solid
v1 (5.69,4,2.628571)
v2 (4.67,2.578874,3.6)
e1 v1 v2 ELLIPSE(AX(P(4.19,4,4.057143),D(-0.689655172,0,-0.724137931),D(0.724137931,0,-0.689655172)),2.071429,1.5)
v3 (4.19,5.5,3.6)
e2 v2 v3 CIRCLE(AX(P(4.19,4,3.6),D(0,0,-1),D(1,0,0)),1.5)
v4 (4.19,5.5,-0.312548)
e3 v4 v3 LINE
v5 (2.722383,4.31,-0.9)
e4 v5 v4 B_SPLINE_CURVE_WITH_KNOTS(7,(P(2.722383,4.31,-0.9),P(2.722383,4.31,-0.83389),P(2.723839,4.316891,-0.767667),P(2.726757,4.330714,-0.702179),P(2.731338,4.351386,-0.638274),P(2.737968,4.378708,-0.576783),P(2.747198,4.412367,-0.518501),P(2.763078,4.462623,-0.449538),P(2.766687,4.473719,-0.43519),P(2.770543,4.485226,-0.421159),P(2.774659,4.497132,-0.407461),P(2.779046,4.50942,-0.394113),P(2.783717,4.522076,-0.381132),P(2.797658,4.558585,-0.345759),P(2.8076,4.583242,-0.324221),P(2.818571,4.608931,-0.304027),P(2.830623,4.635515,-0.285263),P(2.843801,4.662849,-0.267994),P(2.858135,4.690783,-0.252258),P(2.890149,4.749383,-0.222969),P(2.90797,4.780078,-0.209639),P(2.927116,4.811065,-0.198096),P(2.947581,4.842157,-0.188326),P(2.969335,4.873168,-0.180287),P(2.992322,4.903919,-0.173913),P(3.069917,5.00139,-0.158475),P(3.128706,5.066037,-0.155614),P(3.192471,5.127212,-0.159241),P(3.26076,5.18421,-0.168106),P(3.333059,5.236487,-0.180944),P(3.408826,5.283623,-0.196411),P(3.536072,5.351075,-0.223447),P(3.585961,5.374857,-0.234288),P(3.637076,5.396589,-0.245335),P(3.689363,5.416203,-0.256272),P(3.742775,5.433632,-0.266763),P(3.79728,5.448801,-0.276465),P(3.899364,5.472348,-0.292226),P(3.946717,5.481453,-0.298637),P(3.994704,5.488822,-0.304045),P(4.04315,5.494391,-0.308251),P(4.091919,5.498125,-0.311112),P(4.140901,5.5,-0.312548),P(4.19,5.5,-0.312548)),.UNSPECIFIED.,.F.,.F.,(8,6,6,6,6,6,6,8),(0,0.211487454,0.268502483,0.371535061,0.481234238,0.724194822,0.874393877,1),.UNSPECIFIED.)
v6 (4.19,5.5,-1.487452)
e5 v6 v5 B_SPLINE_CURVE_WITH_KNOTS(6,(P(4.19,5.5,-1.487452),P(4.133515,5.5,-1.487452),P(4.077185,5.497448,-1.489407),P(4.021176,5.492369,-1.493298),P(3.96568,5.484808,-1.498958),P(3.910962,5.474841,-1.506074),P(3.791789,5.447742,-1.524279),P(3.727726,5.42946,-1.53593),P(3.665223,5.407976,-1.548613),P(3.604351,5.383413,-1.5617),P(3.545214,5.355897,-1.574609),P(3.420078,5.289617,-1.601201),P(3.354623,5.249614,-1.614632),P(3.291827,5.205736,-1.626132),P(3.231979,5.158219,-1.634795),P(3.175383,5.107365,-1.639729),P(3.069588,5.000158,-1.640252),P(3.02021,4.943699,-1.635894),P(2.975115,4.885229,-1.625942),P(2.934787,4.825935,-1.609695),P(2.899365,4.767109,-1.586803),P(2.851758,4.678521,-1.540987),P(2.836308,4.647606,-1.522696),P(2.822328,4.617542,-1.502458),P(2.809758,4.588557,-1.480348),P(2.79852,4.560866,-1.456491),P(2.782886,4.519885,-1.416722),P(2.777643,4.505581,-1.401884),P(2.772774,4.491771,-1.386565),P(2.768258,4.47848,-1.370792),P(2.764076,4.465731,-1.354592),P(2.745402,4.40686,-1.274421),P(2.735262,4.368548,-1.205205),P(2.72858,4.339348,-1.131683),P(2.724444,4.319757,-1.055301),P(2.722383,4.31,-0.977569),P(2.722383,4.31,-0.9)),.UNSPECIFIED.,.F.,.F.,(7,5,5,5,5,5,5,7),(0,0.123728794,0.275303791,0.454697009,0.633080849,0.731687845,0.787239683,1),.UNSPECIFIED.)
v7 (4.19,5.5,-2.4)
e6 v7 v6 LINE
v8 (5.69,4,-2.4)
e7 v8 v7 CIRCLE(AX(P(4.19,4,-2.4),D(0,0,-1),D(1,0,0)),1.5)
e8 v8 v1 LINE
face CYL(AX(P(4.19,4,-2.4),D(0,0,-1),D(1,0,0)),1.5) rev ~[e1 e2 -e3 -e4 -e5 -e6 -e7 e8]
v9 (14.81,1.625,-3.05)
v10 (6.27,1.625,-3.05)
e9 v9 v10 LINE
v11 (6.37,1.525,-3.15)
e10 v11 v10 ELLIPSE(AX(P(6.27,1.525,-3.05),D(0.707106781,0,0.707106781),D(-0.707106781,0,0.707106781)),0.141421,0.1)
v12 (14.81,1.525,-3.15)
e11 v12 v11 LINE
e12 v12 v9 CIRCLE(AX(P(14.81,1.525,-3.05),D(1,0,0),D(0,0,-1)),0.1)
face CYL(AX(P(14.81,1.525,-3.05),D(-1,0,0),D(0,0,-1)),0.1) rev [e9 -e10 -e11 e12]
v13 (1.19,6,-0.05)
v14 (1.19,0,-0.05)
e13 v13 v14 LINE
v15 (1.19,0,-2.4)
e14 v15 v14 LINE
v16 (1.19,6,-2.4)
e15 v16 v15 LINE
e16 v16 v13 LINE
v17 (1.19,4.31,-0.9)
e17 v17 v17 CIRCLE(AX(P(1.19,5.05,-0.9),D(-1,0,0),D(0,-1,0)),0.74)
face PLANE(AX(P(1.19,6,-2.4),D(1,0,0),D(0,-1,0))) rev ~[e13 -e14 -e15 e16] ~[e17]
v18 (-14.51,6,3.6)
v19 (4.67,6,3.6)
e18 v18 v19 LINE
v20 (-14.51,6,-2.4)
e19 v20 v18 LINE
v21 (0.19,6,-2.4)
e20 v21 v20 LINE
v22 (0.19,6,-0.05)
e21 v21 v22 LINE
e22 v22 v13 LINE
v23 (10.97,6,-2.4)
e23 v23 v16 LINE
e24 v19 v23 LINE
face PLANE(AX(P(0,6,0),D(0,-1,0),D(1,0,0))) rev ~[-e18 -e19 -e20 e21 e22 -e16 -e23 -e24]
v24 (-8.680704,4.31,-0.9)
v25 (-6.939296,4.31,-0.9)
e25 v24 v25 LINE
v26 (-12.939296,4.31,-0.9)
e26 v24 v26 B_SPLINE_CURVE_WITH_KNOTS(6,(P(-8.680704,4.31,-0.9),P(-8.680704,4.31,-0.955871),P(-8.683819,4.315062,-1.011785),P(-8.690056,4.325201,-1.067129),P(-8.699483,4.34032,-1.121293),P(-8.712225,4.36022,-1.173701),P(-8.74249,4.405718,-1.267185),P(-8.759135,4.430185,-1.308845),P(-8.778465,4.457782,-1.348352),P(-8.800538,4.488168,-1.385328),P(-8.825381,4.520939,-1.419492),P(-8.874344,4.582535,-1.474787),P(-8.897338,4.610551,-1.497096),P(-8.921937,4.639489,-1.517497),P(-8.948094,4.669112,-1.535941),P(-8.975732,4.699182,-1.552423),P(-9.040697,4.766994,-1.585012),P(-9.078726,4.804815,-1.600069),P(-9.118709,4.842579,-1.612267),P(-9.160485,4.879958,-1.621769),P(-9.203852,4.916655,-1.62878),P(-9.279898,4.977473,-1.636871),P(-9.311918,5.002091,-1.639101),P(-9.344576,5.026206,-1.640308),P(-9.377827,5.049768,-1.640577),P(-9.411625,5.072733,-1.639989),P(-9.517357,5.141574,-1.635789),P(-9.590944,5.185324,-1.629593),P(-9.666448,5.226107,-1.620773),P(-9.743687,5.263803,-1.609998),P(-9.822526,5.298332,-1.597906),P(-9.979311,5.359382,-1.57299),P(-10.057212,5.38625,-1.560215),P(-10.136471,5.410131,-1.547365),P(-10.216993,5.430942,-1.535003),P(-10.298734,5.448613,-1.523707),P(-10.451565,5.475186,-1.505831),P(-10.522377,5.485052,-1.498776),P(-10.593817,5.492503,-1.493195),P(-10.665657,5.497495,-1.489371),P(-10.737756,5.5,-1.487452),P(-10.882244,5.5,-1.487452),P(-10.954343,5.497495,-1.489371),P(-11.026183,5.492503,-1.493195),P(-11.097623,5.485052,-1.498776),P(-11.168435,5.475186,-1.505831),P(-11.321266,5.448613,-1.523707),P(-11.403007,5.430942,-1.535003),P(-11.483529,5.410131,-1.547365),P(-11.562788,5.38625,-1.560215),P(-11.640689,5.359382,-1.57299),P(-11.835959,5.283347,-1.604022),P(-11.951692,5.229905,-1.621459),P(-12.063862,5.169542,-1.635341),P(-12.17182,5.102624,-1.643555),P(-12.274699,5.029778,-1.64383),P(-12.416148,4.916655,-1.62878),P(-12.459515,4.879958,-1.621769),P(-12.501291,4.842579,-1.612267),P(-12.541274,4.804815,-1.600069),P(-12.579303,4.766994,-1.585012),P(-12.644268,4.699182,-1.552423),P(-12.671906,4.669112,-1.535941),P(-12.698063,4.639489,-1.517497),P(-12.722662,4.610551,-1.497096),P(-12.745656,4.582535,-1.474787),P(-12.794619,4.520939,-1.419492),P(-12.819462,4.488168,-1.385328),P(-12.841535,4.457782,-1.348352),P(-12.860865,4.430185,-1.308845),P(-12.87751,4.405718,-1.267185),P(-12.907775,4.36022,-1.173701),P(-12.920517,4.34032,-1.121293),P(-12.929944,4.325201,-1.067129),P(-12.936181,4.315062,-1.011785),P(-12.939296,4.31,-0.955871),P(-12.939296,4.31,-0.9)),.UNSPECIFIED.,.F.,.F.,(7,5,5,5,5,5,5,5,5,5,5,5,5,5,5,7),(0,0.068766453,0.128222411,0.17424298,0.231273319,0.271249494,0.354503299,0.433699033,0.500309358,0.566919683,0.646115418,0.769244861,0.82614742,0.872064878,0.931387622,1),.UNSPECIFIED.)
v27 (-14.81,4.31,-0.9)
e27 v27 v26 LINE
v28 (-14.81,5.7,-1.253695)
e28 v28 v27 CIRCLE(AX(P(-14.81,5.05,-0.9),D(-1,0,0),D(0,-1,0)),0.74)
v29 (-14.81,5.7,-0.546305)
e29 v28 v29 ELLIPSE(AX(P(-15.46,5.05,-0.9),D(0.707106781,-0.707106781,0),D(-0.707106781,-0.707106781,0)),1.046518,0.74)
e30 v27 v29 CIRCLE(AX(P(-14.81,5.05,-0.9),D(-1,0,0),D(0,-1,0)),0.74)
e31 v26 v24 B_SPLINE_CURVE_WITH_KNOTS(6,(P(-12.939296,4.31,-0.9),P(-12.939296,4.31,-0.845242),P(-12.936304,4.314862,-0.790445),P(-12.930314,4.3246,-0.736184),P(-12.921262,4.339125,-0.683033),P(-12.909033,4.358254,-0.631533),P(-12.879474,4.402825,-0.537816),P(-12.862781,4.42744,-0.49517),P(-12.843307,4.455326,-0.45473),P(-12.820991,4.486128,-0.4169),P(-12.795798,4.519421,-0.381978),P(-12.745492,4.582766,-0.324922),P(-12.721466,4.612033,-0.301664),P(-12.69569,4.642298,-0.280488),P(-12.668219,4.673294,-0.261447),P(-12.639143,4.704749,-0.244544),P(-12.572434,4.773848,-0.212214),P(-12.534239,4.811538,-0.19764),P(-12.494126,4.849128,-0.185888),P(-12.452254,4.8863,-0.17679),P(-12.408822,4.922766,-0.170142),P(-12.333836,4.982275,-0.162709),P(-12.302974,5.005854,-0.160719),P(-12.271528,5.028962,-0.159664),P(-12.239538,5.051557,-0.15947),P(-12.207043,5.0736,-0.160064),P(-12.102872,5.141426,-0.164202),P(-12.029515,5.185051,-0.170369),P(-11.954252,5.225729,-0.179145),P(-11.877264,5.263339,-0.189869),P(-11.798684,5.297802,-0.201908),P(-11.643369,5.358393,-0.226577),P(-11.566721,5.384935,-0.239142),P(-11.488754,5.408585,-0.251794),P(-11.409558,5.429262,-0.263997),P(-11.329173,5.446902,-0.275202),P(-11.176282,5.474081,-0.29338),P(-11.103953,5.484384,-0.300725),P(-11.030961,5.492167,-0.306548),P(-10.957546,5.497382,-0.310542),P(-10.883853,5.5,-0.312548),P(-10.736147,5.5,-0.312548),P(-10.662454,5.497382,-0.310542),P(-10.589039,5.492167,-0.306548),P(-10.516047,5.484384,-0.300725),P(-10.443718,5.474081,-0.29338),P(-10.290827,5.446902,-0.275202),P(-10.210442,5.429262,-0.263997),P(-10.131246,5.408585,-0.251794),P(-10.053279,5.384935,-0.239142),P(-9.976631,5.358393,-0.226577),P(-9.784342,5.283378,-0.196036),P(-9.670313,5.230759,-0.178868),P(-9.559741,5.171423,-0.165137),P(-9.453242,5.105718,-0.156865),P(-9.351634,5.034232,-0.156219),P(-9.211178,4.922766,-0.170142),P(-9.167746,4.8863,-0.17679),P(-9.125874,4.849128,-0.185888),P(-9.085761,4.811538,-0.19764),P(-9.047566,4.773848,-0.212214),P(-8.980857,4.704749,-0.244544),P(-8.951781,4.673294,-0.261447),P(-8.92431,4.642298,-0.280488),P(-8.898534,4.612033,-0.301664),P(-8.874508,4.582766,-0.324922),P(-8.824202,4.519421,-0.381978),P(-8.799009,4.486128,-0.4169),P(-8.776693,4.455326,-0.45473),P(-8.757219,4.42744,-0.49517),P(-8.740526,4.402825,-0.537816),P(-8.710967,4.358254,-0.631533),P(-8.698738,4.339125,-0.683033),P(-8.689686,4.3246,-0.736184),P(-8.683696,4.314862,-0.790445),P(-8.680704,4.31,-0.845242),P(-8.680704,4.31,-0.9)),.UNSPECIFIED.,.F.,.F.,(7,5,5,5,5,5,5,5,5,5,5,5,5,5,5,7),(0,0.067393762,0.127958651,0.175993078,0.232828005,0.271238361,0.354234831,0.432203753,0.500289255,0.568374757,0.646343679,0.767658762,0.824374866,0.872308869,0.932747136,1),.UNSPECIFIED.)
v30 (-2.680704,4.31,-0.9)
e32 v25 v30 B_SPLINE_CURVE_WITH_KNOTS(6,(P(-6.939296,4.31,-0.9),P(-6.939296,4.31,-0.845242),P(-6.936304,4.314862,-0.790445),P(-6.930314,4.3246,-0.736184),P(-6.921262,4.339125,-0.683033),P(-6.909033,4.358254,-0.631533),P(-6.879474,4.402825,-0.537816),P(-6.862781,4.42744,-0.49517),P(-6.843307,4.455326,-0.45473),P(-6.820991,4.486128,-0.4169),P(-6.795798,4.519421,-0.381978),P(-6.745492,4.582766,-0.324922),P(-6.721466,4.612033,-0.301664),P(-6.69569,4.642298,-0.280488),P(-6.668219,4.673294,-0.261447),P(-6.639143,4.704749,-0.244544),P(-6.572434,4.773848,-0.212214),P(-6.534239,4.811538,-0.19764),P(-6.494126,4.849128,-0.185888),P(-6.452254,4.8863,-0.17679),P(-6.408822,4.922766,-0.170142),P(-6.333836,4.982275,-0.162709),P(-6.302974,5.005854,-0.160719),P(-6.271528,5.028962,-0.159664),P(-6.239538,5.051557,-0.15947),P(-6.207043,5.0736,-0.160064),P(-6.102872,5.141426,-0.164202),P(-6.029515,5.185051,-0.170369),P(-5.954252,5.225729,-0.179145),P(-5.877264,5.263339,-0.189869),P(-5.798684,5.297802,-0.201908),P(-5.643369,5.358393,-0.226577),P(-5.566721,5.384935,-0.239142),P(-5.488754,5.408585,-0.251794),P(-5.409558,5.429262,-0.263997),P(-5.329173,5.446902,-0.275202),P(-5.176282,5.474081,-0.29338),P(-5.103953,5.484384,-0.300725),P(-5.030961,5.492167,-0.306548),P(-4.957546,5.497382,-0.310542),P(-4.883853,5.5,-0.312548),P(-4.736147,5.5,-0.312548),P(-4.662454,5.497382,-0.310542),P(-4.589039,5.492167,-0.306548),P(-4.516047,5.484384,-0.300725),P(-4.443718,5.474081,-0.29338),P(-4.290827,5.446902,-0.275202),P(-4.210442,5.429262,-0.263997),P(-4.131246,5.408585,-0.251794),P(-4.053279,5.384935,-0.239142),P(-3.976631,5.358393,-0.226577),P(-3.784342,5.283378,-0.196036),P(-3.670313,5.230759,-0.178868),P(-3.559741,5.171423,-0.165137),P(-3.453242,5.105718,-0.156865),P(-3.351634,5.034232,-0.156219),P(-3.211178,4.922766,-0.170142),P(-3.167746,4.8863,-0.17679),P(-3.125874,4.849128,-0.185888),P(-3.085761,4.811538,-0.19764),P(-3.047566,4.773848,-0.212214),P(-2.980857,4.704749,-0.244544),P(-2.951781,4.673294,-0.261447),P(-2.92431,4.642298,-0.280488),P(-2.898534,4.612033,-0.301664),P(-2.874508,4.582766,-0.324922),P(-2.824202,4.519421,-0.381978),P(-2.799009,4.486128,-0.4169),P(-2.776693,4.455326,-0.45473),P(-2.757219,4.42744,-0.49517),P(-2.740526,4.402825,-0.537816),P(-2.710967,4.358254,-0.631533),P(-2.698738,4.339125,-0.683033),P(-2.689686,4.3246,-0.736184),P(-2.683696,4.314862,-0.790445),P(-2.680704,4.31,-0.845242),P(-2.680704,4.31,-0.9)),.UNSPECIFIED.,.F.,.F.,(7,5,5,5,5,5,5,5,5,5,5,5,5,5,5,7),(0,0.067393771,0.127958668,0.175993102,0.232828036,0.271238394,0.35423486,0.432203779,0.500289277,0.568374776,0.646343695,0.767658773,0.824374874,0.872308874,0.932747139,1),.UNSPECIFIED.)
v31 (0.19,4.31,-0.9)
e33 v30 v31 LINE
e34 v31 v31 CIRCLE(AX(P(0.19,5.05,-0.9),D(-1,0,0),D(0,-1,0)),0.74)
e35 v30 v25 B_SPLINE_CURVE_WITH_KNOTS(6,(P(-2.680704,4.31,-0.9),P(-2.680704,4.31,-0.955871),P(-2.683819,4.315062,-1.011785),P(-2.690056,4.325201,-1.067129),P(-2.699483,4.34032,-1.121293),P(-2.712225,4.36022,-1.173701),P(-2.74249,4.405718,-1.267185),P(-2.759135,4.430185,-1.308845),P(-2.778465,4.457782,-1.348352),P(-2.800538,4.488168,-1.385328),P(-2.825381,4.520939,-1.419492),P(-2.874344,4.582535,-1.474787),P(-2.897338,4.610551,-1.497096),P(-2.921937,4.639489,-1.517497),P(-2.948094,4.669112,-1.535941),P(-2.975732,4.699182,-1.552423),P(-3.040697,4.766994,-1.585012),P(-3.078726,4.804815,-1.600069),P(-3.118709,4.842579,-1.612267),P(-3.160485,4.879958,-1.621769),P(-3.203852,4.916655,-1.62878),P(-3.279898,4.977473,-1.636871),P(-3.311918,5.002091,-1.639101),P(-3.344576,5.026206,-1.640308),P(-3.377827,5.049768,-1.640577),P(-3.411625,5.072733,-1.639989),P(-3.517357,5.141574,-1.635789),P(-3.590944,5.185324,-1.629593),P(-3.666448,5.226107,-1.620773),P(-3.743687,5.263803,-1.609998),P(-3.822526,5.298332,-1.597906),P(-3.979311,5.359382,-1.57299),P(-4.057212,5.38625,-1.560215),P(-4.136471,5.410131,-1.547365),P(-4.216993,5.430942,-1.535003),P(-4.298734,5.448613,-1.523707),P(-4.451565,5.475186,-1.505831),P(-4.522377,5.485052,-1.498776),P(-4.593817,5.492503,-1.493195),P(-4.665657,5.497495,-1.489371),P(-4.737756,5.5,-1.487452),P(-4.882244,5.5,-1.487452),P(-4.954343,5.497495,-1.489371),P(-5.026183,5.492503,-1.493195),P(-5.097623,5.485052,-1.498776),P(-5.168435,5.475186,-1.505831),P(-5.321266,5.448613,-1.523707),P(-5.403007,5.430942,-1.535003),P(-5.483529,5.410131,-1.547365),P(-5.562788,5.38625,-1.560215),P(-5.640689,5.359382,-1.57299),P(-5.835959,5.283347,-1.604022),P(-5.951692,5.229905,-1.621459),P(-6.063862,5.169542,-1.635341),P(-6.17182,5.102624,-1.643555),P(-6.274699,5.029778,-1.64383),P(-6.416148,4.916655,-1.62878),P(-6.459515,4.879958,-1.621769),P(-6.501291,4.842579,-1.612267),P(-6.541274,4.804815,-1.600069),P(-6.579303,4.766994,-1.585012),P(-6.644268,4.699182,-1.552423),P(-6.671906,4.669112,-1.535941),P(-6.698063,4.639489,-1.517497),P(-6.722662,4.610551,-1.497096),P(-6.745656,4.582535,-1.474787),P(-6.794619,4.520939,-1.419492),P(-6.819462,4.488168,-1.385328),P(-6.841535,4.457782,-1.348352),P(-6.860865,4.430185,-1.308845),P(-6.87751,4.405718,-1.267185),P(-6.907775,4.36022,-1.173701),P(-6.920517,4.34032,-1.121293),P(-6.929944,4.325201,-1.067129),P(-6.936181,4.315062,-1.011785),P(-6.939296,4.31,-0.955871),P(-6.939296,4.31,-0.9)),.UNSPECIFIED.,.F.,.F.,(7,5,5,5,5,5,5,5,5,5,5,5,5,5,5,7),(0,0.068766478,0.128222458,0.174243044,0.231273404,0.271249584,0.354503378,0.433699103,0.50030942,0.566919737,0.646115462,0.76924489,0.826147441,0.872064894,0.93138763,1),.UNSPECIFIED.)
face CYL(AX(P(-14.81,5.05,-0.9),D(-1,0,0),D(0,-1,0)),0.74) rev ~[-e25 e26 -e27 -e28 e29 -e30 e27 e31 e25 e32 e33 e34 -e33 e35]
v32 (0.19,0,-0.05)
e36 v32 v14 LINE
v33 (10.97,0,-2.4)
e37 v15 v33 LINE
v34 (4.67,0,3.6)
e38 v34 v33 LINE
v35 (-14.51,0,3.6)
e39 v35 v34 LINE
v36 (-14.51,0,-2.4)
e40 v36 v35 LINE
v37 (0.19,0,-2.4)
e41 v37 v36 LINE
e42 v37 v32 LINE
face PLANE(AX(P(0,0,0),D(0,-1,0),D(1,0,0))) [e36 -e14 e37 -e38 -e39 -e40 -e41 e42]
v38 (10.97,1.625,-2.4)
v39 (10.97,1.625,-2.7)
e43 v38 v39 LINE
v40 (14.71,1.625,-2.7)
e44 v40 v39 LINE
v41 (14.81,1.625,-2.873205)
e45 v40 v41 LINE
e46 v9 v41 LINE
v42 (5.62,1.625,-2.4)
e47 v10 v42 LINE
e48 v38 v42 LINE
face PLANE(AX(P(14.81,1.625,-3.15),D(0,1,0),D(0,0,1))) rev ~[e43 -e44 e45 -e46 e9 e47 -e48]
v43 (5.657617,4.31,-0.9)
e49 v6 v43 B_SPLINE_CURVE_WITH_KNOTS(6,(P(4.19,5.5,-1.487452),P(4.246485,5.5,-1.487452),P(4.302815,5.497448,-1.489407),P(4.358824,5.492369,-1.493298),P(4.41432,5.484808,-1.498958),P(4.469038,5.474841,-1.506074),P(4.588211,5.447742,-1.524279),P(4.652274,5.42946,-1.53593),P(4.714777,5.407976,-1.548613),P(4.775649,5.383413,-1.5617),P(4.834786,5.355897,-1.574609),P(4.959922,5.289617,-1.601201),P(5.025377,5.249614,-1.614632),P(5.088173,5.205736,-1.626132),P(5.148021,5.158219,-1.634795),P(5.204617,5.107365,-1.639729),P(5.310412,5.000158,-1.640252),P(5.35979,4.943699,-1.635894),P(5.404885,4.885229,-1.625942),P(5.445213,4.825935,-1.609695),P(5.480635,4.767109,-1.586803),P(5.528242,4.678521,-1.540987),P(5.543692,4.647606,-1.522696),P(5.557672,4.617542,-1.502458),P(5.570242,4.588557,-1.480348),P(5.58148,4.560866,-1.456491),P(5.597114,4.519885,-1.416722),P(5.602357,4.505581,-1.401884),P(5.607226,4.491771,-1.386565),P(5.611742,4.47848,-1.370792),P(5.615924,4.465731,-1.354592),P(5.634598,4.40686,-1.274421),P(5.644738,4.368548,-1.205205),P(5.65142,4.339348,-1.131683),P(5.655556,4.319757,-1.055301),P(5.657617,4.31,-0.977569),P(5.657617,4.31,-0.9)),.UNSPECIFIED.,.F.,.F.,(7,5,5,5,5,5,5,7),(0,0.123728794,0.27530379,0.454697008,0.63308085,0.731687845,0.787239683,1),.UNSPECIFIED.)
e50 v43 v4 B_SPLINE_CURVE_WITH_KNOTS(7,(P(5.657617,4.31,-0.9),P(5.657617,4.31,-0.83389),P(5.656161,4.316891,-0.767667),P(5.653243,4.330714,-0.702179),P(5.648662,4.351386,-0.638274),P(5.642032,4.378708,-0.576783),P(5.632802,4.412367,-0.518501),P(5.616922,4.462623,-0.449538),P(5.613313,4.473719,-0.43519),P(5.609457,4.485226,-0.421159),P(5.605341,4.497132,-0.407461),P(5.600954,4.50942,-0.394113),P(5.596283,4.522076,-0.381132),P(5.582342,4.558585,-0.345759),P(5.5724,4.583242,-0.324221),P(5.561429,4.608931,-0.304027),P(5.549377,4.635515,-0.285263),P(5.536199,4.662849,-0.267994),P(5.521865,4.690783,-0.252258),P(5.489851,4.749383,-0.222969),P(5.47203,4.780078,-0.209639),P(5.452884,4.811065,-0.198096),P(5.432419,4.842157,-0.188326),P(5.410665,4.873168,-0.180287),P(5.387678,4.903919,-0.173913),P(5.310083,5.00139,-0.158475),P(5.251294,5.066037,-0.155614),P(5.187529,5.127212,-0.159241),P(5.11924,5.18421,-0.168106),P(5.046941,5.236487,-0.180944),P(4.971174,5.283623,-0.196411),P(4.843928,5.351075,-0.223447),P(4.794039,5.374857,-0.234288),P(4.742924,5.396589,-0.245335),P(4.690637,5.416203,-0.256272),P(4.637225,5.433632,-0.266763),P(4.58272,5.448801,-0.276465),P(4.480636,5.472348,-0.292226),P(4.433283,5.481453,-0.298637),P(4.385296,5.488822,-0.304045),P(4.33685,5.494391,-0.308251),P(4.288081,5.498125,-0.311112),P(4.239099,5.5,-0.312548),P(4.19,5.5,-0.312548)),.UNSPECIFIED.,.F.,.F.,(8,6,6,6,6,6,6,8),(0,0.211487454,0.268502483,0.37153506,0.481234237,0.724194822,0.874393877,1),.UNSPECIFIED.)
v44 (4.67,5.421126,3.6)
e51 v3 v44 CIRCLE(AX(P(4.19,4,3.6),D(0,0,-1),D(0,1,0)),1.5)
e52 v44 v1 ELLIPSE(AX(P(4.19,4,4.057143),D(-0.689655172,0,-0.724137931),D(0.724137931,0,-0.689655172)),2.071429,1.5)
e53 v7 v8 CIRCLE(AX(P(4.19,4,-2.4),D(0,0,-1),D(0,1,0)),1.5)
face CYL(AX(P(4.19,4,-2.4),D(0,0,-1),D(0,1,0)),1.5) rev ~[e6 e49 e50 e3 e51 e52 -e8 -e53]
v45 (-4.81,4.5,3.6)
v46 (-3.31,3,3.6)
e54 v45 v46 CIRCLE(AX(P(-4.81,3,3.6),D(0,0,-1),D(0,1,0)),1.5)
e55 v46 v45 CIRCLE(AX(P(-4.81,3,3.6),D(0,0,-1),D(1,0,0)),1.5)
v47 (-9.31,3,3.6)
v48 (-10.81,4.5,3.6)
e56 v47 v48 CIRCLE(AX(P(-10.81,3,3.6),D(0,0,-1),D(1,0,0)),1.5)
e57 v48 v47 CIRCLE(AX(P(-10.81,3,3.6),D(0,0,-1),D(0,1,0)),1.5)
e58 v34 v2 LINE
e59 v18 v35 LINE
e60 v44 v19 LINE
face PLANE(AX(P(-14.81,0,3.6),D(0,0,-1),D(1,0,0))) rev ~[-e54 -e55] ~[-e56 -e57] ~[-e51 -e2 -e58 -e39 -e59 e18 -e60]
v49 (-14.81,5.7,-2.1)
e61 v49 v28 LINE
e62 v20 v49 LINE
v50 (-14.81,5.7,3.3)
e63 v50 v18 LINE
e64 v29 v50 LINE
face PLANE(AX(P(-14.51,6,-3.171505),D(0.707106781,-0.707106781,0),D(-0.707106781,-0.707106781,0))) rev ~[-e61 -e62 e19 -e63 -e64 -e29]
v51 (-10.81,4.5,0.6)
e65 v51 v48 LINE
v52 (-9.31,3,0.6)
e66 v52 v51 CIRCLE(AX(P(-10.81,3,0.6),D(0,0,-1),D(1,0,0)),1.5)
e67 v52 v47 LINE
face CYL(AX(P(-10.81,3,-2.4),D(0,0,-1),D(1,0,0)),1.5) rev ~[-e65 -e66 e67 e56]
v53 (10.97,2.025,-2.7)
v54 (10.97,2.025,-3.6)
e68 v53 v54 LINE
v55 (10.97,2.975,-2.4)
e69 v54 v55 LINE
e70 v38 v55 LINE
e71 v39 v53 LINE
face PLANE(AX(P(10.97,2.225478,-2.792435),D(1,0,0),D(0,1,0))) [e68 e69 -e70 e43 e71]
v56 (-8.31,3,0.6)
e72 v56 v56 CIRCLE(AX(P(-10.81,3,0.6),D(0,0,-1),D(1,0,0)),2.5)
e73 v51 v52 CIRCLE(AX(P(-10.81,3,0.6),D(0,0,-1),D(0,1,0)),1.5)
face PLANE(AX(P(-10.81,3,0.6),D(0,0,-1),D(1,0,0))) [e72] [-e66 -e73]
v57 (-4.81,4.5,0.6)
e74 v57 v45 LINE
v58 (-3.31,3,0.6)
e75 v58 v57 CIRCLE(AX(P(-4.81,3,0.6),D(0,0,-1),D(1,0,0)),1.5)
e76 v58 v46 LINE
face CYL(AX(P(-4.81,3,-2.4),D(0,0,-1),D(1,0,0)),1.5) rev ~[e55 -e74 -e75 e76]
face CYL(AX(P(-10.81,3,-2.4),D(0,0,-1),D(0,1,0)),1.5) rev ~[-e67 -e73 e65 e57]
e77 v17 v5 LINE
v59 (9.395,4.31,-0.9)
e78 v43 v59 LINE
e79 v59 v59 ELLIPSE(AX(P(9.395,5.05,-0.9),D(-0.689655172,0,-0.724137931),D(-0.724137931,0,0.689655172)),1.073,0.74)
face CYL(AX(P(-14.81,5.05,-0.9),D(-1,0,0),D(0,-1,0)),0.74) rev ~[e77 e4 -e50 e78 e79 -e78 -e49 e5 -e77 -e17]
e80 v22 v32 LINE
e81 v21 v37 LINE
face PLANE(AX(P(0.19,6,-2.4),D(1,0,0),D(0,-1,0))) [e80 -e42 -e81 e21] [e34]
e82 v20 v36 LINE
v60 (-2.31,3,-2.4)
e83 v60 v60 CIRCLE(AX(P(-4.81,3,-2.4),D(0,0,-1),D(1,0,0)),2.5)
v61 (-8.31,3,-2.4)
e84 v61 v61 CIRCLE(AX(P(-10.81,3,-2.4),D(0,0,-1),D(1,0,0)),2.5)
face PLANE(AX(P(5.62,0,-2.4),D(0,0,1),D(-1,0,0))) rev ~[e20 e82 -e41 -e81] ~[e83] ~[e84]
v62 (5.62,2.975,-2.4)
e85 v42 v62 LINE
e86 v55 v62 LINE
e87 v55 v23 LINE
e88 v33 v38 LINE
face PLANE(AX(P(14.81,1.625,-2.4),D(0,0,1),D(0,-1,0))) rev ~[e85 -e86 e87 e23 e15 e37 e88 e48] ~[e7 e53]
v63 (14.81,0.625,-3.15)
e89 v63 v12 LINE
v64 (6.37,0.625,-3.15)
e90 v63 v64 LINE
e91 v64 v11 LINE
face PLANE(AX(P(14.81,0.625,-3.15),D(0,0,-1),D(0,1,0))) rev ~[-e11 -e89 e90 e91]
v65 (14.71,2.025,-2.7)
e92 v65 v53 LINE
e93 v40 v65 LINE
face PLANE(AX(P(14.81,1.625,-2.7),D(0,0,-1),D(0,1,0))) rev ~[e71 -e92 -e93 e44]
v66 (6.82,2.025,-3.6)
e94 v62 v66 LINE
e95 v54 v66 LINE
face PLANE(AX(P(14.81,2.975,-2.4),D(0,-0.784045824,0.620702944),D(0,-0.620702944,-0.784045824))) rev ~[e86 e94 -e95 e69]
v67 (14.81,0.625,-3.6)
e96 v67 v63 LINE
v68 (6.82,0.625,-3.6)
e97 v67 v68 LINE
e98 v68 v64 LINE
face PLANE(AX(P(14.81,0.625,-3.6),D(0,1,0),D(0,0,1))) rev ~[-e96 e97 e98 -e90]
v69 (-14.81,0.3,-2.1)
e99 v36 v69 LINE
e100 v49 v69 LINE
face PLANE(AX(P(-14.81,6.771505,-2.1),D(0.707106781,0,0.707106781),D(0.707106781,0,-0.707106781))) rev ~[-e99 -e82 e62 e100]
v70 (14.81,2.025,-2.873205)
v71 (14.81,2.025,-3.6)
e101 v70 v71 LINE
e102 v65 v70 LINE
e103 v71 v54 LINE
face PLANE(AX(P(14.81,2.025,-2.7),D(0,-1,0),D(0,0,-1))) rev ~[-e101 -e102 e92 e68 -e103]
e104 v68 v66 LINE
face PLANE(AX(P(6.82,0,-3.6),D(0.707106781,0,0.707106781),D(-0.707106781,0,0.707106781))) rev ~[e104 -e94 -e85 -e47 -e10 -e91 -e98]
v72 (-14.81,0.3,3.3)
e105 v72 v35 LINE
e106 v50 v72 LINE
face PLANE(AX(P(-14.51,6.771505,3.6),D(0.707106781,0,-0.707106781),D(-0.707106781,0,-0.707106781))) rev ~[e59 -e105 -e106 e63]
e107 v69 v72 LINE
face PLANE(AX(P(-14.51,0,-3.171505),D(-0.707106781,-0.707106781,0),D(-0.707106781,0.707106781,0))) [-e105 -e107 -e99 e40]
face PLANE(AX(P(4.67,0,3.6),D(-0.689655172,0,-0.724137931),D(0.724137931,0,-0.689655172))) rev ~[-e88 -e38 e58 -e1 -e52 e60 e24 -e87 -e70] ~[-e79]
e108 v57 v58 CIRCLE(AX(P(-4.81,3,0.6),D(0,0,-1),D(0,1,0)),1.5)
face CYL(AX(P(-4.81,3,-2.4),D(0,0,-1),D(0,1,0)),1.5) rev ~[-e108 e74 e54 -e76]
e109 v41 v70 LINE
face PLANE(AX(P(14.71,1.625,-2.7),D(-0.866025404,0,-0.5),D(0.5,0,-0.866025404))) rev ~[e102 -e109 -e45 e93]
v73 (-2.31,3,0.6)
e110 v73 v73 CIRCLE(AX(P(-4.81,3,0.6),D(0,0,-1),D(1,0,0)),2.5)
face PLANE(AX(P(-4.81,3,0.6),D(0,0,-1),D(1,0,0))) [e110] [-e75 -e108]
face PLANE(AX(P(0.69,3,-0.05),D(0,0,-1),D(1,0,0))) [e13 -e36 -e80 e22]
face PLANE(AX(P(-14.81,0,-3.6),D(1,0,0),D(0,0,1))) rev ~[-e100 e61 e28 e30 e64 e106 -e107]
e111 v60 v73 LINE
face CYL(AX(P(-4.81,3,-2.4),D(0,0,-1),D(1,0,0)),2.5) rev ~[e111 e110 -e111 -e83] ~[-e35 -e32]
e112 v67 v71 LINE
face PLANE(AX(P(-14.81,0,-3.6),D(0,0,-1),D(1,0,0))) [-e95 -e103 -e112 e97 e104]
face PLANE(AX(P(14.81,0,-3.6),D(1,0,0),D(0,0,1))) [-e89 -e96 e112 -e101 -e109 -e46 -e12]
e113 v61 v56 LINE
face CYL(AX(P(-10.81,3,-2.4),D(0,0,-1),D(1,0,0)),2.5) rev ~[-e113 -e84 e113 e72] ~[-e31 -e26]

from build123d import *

# Parameters (mm, degrees)
F0_W         = 29.62
F0_H         = 7.2
F1_DEPTH     = 6
F3_DEPTH     = 6
F5_DEPTH     = 6
F6_W         = 1
F6_H         = 6
F7_DEPTH     = 2.35
F8_W         = 3.025
F8_H         = 1.2
F9_DEPTH     = 9.191
F11_DEPTH    = 9.191
F12_W        = 0.625
F12_H        = 0.45
F13_DEPTH    = 9.191
F14_R        = 0.1
F16_DEPTH    = 3.84
F18_DEPTH    = 0.4
F20_DEPTH    = 6
F21_R        = 2.5
F22_DEPTH    = 3
F24_DEPTH    = 29.621
F25_T1_DEPTH = 7.5430097928
F25_T3_DEPTH = 7.5430097928
F27_DEPTH    = 6


# Not quite as in the source:
# - a fillet or chamfer that OpenCascade refuses, or shapes differently, is made with other operations: its cross-section is extruded or revolved along the edge and cut away or added


with BuildPart() as f1:
    # F0 (on Front) → F1 (new body)
    with BuildSketch(Plane.XZ):
        Rectangle(F0_W, F0_H)
    extrude(amount=-F1_DEPTH)

    # F2 (on face) → F3 (cut, through all)
    with BuildSketch(Plane.XZ):
        Polygon((10.97, -2.4), (14.81, -2.4), (14.81, 3.6), (4.67, 3.6), align=None)
    extrude(amount=-F3_DEPTH, mode=Mode.SUBTRACT)

    # F4 (on face) → F5 (cut, through all)
    with BuildSketch(Plane.XZ):
        Polygon((6.82, -3.6), (5.62, -2.4), (-14.81, -2.4), (-14.81, -3.6), align=None)
    extrude(amount=-F5_DEPTH, mode=Mode.SUBTRACT)

    # F6 (on face) → F7 (cut)
    with BuildSketch(Plane(origin=(0, 0, -2.4), x_dir=(1, 0, 0), z_dir=(0, 0, -1))):
        with Locations((0.69, -3)):
            Rectangle(F6_W, F6_H)
    extrude(amount=-F7_DEPTH, mode=Mode.SUBTRACT)

    # F8 (on face) → F9 (cut, through all)
    with BuildSketch(Plane.YZ.offset(14.81)):
        with Locations((4.4875, -3)):
            Rectangle(F8_W, F8_H)
    extrude(amount=-F9_DEPTH, mode=Mode.SUBTRACT)

    # F10 (on face) → F11 (cut, through all)
    with BuildSketch(Plane.YZ.offset(14.81)):
        Polygon((2.025, -3.6), (2.975, -3.6), (2.975, -2.4), align=None)
    extrude(amount=-F11_DEPTH, mode=Mode.SUBTRACT)

    # F12 (on face) → F13 (cut, through all)
    with BuildSketch(Plane.YZ.offset(14.81)):
        with Locations((0.3125, -3.375)):
            Rectangle(F12_W, F12_H)
        Polygon((0, -3.15), (0.625, -3.15), (1.625, -3.15), (1.625, -2.4), (0, -2.4), align=None)
    extrude(amount=-F13_DEPTH, mode=Mode.SUBTRACT)

    # F14
    f14_edges = [f1.edges().sort_by_distance(p)[0] for p in [
        (10.59, 1.625, -3.15),
    ]]
    fillet(f14_edges, radius=F14_R)

    # F15 (on face) → F16 (cut)
    with BuildSketch(Plane.YZ.offset(14.81)):
        Polygon((2.025, -2.7), (2.025, -3.6), (2.975, -2.4), (1.625, -2.4), (1.625, -2.7), align=None)
    extrude(amount=-F16_DEPTH, mode=Mode.SUBTRACT)

    # F17 (on face) → F18 (cut, through all)
    with BuildSketch(Plane.XZ.offset(-1.625)):
        Polygon((14.81, -2.8732050808), (14.81, -2.7), (14.71, -2.7), align=None)
    extrude(amount=-F18_DEPTH, mode=Mode.SUBTRACT)

    # F19 (on face) → F20 (cut, through all)
    with BuildSketch(Plane(origin=(0, 0, -2.4), x_dir=(1, 0, 0), z_dir=(0, 0, -1))):
        with BuildLine():
            ThreePointArc((-3.31, -3), (-5.8706601718, -1.9393398282), (-4.81, -4.5))
            ThreePointArc((-4.81, -4.5), (-3.7493398282, -4.0606601718), (-3.31, -3))
        make_face()
        with BuildLine():
            ThreePointArc((-9.31, -3), (-11.8706601718, -1.9393398282), (-10.81, -4.5))
            ThreePointArc((-10.81, -4.5), (-9.7493398282, -4.0606601718), (-9.31, -3))
        make_face()
    extrude(amount=-F20_DEPTH, mode=Mode.SUBTRACT)

    # F21 (on face) → F22 (cut)
    with BuildSketch(Plane(origin=(0, 0, -2.4), x_dir=(1, 0, 0), z_dir=(0, 0, -1))):
        with Locations((-10.81, -3)):
            Circle(F21_R)
        with Locations((-4.81, -3)):
            Circle(F21_R)
    extrude(amount=-F22_DEPTH, mode=Mode.SUBTRACT)

    # F23 (on face) → F24 (cut, through all)
    with BuildSketch(Plane(origin=(-14.81, 0, 0), x_dir=(0, -1, 0), z_dir=(-1, 0, 0))):
        with BuildLine():
            ThreePointArc((-5.79, -0.9), (-5.05, -1.64), (-4.31, -0.9))
            ThreePointArc((-4.31, -0.9), (-5.05, -0.16), (-5.79, -0.9))
        make_face()
    extrude(amount=-F24_DEPTH, mode=Mode.SUBTRACT)

    # F25: chamfer of 0.3 on 4 edges, made by hand

    # F25_s2 → F25_t1 (cut)
    with BuildSketch(Plane.XY.offset(-3.1715048964)):
        Polygon((-14.51, 0), (-14.81, 0.3), (-14.81, 0), align=None)
        Polygon((-14.51, 6), (-14.81, 5.7), (-14.81, 6), align=None)
    extrude(amount=F25_T1_DEPTH, mode=Mode.SUBTRACT)

    # F25_s4 → F25_t3 (cut)
    with BuildSketch(Plane.XZ.offset(-6.7715048964)):
        Polygon((-14.51, 3.6), (-14.81, 3.3), (-14.81, 3.6), align=None)
        Polygon((-14.81, -2.1), (-14.51, -2.4), (-14.81, -2.4), align=None)
    extrude(amount=F25_T3_DEPTH, mode=Mode.SUBTRACT)

    # F26 (on face) → F27 (cut, through all)
    with BuildSketch(Plane(origin=(0, 0, -2.4), x_dir=(1, 0, 0), z_dir=(0, 0, -1))):
        with BuildLine():
            ThreePointArc((4.19, -5.5), (5.2506601718, -5.0606601718), (5.69, -4))
            ThreePointArc((5.69, -4), (3.1293398282, -2.9393398282), (4.19, -5.5))
        make_face()
    extrude(amount=-F27_DEPTH, mode=Mode.SUBTRACT)


solid = f1.part
